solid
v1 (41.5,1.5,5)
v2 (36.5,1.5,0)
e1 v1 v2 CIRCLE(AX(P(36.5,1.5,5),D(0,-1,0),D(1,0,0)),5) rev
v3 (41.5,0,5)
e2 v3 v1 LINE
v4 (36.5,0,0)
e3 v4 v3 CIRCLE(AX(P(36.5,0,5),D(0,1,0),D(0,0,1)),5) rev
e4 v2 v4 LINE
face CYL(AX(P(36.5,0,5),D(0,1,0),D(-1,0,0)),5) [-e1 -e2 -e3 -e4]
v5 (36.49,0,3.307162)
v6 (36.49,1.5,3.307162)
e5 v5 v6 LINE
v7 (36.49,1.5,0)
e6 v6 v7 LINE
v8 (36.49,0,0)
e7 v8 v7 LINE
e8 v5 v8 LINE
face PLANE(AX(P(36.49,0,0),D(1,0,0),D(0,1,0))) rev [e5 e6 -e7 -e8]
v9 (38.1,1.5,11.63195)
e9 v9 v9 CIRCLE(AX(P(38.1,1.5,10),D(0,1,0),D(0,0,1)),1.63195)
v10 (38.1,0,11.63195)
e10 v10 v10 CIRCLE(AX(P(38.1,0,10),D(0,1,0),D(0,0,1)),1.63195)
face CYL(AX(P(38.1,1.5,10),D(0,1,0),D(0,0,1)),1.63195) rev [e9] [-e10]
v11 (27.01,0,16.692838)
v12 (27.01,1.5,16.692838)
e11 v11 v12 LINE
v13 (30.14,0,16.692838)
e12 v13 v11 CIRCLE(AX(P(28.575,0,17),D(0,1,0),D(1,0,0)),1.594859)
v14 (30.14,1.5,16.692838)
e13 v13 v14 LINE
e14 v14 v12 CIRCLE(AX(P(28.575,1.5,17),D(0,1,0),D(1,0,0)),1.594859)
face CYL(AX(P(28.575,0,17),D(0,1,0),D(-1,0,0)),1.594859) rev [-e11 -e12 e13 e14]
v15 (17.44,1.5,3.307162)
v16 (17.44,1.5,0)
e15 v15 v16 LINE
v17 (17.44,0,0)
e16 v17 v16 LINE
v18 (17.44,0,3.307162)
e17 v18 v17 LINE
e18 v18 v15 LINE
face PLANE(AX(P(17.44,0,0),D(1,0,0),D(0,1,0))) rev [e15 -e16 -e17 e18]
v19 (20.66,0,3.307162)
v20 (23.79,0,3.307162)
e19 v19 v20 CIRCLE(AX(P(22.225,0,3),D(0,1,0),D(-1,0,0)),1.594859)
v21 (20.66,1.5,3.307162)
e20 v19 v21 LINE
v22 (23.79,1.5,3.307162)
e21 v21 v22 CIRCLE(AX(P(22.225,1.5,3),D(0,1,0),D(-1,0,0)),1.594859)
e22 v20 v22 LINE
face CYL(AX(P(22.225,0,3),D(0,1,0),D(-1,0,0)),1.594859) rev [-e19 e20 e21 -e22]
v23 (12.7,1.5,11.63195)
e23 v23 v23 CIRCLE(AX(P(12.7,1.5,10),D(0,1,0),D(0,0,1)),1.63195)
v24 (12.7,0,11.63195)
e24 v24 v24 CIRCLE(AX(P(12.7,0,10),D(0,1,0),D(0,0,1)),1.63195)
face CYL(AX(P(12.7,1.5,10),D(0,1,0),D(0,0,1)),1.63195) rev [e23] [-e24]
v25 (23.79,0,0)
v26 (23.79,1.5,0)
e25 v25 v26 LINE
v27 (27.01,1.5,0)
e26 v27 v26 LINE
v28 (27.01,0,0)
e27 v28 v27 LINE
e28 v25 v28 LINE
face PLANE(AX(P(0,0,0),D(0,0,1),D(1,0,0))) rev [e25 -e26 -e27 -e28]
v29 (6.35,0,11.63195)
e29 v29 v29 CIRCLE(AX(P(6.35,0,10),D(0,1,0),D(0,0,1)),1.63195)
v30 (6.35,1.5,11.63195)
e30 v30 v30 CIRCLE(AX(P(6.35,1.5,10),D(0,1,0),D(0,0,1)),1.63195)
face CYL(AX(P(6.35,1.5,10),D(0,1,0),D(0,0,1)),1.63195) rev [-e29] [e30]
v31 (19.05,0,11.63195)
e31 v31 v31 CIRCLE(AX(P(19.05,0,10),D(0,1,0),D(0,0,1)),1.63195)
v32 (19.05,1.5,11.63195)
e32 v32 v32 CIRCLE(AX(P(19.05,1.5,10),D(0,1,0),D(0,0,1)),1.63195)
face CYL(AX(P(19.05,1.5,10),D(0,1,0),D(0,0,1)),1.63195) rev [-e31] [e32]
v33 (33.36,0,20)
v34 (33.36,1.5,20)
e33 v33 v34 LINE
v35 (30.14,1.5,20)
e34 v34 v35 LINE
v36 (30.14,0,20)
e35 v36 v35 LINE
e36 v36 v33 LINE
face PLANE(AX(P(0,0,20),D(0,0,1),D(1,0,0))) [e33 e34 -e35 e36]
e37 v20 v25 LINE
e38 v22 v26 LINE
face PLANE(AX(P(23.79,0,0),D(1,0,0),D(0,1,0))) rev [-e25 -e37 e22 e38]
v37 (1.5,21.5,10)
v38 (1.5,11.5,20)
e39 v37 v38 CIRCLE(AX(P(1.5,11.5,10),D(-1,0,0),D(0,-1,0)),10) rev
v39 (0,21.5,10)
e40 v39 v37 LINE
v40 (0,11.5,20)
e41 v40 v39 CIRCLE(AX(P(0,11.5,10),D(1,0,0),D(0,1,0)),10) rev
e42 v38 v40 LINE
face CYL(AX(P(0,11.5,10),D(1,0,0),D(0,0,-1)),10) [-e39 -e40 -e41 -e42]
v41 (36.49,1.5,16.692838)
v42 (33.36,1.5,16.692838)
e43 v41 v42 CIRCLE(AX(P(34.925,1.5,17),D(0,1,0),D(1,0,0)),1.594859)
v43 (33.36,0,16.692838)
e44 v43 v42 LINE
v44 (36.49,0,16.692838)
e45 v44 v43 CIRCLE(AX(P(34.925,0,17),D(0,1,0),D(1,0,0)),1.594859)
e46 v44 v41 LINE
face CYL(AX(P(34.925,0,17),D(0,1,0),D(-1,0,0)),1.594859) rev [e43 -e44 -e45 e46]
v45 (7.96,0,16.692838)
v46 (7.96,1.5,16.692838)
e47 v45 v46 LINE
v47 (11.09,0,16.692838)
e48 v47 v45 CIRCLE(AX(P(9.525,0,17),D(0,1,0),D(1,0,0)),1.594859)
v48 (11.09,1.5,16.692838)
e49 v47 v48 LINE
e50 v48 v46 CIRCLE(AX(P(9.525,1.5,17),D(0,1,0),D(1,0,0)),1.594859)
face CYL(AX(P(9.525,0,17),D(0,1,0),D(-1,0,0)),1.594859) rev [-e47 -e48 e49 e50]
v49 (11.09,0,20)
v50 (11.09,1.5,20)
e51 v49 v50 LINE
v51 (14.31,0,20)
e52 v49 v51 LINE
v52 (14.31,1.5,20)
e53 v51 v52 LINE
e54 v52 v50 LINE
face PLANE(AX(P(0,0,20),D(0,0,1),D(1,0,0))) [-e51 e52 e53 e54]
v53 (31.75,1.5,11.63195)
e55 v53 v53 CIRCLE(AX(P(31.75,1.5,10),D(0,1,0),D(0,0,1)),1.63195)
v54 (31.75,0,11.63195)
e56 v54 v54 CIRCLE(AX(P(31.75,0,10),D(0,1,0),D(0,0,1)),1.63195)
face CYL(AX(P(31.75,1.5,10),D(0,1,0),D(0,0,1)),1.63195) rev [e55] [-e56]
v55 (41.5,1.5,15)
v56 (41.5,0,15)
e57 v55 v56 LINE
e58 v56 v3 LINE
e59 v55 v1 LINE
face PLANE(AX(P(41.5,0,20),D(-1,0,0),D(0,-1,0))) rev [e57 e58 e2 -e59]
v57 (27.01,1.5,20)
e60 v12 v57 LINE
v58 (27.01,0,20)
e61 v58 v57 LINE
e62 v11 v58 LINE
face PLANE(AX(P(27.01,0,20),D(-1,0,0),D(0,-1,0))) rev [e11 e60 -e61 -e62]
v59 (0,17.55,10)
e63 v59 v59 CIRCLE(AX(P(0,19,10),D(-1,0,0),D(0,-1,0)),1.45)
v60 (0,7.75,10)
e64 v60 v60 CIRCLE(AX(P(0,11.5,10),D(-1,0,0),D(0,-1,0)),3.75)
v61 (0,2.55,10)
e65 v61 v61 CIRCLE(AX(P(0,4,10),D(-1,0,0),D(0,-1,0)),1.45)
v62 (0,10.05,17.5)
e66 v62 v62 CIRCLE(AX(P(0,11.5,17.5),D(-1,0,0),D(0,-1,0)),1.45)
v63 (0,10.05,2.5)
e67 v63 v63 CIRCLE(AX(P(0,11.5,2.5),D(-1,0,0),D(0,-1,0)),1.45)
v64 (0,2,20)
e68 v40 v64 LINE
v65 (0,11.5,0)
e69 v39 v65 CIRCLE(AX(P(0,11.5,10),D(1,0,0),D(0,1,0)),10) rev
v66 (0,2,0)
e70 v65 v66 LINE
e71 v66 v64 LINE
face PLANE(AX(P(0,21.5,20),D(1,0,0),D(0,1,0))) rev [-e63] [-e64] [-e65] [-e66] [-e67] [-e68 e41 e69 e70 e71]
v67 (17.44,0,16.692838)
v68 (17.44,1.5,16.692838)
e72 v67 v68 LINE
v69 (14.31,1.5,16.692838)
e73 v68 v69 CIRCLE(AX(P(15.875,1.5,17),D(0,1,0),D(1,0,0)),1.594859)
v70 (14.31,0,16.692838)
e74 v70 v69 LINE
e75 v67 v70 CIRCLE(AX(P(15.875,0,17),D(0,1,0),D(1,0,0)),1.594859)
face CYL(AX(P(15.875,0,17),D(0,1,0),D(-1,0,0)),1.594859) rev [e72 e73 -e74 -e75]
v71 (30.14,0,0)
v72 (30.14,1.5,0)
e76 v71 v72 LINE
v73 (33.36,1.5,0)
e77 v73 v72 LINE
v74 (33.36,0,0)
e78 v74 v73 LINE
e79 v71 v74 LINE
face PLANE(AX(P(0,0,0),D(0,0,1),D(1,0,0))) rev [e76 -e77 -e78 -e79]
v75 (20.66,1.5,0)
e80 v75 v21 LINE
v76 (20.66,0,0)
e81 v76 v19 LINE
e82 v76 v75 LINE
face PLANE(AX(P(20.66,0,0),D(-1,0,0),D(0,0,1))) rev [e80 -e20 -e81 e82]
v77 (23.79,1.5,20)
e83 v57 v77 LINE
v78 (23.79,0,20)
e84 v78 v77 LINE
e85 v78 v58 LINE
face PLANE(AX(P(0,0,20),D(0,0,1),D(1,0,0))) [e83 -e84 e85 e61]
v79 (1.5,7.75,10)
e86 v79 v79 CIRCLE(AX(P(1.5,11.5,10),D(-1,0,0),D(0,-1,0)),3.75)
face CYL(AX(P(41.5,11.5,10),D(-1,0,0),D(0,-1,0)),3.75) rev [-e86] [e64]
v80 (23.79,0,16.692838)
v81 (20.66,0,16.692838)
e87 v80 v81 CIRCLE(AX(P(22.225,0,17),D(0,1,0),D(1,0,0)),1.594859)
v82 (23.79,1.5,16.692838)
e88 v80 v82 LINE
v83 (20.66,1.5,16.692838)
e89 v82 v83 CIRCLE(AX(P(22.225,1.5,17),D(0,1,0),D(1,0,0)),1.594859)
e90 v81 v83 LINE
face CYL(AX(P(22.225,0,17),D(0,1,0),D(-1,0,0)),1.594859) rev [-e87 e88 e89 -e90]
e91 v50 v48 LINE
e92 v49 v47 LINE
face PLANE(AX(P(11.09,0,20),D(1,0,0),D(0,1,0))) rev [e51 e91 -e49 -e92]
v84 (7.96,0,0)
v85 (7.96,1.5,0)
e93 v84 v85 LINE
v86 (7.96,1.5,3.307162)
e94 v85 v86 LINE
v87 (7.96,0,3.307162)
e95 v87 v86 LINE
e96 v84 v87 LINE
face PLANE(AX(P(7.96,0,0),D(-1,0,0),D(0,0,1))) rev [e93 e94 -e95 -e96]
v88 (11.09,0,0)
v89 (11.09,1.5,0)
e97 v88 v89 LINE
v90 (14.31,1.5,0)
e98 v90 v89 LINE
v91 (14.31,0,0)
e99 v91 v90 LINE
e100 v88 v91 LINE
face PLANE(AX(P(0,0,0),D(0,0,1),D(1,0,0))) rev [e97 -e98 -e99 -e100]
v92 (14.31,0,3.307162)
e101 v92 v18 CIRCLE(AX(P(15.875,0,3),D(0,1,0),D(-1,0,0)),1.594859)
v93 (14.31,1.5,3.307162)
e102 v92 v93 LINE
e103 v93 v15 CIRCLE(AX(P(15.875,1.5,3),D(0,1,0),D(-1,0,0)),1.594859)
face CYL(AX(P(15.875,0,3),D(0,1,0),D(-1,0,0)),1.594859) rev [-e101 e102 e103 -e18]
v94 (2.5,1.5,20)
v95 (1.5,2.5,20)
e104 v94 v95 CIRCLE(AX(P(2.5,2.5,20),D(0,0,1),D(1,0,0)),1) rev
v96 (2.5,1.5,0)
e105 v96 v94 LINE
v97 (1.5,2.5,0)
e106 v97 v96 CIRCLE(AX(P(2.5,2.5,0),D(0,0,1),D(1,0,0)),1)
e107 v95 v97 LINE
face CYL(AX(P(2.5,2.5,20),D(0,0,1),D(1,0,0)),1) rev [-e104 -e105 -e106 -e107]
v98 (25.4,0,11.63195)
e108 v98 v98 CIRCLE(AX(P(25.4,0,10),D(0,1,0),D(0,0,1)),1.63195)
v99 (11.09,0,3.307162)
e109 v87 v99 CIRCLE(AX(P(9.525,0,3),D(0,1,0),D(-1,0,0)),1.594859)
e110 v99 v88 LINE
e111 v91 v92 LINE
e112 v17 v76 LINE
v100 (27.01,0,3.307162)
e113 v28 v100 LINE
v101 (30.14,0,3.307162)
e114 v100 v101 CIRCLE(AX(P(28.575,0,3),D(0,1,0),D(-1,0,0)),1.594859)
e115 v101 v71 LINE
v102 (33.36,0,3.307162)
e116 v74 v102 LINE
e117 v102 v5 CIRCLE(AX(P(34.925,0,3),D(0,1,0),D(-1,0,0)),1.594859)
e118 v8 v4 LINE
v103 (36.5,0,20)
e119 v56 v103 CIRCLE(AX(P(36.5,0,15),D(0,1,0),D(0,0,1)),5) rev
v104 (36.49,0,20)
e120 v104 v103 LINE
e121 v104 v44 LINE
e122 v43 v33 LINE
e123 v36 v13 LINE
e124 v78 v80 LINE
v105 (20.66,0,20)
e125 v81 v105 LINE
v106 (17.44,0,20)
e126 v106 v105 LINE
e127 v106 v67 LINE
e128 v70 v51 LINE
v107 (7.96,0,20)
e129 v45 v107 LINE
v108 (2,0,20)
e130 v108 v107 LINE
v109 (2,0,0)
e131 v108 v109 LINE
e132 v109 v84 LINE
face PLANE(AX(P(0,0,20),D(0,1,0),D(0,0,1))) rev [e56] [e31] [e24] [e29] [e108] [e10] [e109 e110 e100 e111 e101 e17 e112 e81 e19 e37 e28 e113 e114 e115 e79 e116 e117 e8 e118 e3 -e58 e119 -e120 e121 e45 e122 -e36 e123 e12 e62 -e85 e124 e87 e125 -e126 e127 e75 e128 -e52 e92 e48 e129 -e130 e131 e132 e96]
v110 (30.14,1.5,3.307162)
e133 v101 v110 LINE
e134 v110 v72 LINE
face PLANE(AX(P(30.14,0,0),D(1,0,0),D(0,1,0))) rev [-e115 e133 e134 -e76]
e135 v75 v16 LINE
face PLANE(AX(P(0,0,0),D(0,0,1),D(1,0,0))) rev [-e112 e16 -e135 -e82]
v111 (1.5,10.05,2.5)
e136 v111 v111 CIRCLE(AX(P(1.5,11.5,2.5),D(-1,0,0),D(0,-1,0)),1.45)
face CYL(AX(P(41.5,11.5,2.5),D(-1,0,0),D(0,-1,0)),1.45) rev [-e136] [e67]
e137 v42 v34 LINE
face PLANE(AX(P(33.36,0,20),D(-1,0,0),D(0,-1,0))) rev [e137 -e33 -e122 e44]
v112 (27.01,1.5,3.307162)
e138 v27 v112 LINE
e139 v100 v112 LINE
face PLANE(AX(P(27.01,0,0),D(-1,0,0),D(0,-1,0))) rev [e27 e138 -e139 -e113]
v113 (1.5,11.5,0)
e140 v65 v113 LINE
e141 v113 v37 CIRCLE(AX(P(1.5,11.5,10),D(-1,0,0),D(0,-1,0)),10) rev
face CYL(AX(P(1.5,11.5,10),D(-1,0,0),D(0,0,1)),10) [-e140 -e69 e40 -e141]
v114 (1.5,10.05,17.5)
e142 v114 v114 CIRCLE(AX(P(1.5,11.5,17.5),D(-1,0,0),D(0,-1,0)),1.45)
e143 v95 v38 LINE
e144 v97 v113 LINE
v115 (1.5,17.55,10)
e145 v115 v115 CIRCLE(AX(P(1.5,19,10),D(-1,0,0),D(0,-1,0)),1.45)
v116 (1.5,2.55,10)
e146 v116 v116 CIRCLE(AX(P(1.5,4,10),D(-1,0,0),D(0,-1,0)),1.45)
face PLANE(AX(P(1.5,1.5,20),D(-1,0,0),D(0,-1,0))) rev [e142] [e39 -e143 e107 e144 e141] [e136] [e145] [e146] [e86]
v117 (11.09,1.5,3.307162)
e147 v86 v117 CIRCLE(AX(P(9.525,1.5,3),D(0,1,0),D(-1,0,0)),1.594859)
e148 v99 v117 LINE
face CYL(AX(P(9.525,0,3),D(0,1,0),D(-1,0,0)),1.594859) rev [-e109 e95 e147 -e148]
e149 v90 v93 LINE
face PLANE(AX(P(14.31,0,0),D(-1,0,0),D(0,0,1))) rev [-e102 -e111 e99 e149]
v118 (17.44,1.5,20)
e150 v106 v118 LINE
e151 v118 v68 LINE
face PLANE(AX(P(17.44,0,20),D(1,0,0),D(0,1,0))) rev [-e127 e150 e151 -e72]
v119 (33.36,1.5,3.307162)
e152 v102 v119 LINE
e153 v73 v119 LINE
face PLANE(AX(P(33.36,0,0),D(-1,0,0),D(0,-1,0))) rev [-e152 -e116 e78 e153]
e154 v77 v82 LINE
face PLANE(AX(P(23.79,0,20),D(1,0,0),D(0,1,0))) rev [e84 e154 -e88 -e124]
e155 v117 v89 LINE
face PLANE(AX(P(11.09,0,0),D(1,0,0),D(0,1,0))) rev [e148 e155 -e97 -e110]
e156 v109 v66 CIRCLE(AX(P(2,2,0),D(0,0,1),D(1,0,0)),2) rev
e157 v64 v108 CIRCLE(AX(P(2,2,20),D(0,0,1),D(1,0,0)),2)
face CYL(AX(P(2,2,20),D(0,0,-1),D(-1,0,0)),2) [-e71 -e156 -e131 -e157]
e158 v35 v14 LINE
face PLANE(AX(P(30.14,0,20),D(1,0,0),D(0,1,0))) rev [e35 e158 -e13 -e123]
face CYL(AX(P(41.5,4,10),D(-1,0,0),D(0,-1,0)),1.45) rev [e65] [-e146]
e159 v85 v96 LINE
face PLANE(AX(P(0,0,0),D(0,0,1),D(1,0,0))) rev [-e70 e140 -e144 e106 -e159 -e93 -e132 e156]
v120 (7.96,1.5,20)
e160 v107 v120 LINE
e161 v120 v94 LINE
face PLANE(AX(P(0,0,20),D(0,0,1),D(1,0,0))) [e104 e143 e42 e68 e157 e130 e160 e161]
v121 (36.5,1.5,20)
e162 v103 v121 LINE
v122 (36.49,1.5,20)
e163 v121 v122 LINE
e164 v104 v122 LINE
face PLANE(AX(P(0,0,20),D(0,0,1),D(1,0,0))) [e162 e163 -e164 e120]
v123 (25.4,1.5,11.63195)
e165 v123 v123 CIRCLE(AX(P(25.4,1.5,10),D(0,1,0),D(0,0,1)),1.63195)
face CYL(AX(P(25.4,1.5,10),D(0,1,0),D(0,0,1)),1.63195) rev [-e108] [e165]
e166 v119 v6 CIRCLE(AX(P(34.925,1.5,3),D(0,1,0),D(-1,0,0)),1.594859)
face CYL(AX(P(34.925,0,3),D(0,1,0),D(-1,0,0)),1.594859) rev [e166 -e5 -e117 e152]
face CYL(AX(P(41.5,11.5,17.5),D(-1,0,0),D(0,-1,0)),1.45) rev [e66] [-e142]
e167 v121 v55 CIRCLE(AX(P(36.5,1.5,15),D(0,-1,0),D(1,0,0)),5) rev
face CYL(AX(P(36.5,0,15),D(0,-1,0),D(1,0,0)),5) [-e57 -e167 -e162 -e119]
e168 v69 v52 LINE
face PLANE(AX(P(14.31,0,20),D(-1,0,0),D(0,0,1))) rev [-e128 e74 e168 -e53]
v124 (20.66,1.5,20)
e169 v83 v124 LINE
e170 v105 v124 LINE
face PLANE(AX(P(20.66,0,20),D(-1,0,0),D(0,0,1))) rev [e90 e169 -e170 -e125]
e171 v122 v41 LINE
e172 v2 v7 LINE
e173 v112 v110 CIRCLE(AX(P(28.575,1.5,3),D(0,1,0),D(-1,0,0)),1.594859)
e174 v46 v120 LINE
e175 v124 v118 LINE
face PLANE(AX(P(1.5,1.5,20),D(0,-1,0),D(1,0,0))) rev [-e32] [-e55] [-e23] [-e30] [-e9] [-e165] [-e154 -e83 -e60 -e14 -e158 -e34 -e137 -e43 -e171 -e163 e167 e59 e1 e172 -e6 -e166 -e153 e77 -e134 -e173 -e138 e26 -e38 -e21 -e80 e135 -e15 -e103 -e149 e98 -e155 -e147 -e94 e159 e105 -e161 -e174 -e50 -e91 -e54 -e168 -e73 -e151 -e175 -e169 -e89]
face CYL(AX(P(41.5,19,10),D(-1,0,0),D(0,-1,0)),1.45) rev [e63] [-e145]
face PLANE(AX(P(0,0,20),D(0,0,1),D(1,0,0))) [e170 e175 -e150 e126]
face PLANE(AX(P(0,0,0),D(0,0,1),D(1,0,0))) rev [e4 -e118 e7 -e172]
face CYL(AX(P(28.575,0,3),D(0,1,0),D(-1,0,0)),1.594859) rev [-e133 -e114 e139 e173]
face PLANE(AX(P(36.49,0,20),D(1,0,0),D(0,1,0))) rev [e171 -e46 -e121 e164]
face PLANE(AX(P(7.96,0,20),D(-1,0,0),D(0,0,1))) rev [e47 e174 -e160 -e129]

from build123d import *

# Parameters (mm, degrees)
BOSS_EXTRUDE1_DEPTH   = 20
FILLET1_R             = 2
FILLET2_R             = 1
CUT_EXTRUDE1_DEPTH    = 51.222007128
F_4_CLEARANCE_HOLE1_D = 3.2639
FILLET3_R             = 5
FILLET4_R             = 10
SKETCH7_R             = 3.75
SKETCH7_R_2           = 1.45
CUT_EXTRUDE2_DEPTH    = 51.83797793


with BuildPart() as part:
    # Sketch1 → Boss-Extrude1 (new body)
    with BuildSketch(Plane.XY):
        Polygon((0, 0), (41.5, 0), (41.5, 1.5), (1.5, 1.5), (1.5, 21.5), (0, 21.5), align=None)
    extrude(amount=BOSS_EXTRUDE1_DEPTH)

    # Fillet1
    fillet1_edges = [part.edges().sort_by_distance(p)[0] for p in [
        (0, 0, 10),
    ]]
    fillet(fillet1_edges, radius=FILLET1_R)

    # Fillet2
    fillet2_edges = [part.edges().sort_by_distance(p)[0] for p in [
        (1.5, 1.5, 10),
    ]]
    fillet(fillet2_edges, radius=FILLET2_R)

    # Sketch3 → Cut-Extrude1 (cut, through all)
    with BuildSketch(Plane(origin=(0, 1.5, 0), x_dir=(1, 0, 0), z_dir=(0, 1, 0))):
        with BuildLine():
            Line((7.96, 0), (11.09, 0))
            Line((11.09, 0), (11.09, -3.307162367))
            ThreePointArc((11.09, -3.307162367), (9.525, -4.594858526), (7.96, -3.307162367))
            Line((7.96, -3.307162367), (7.96, 0))
        make_face()
        with BuildLine():
            Line((14.31, 0), (17.44, 0))
            Line((17.44, 0), (17.44, -3.307162367))
            ThreePointArc((17.44, -3.307162367), (15.875, -4.594858526), (14.31, -3.307162367))
            Line((14.31, -3.307162367), (14.31, 0))
        make_face()
        with BuildLine():
            Line((20.66, 0), (23.79, 0))
            Line((23.79, 0), (23.79, -3.307162367))
            ThreePointArc((23.79, -3.307162367), (22.225, -4.594858526), (20.66, -3.307162367))
            Line((20.66, -3.307162367), (20.66, 0))
        make_face()
        with BuildLine():
            Line((27.01, 0), (30.14, 0))
            Line((30.14, 0), (30.14, -3.307162367))
            ThreePointArc((30.14, -3.307162367), (28.575, -4.594858526), (27.01, -3.307162367))
            Line((27.01, -3.307162367), (27.01, 0))
        make_face()
        with BuildLine():
            Line((33.36, 0), (36.49, 0))
            Line((36.49, 0), (36.49, -3.307162367))
            ThreePointArc((36.49, -3.307162367), (34.925, -4.594858526), (33.36, -3.307162367))
            Line((33.36, -3.307162367), (33.36, 0))
        make_face()
        with BuildLine():
            Line((36.49, -20), (36.49, -16.692837633))
            ThreePointArc((36.49, -16.692837633), (34.925, -15.405141474), (33.36, -16.692837633))
            Line((33.36, -16.692837633), (33.36, -20))
            Line((33.36, -20), (36.49, -20))
        make_face()
        with BuildLine():
            Line((30.14, -20), (30.14, -16.692837633))
            ThreePointArc((30.14, -16.692837633), (28.575, -15.405141474), (27.01, -16.692837633))
            Line((27.01, -16.692837633), (27.01, -20))
            Line((27.01, -20), (30.14, -20))
        make_face()
        with BuildLine():
            Line((23.79, -20), (23.79, -16.692837633))
            ThreePointArc((23.79, -16.692837633), (22.225, -15.405141474), (20.66, -16.692837633))
            Line((20.66, -16.692837633), (20.66, -20))
            Line((20.66, -20), (23.79, -20))
        make_face()
        with BuildLine():
            Line((17.44, -20), (17.44, -16.692837633))
            ThreePointArc((17.44, -16.692837633), (15.875, -15.405141474), (14.31, -16.692837633))
            Line((14.31, -16.692837633), (14.31, -20))
            Line((14.31, -20), (17.44, -20))
        make_face()
        with BuildLine():
            Line((11.09, -20), (11.09, -16.692837633))
            ThreePointArc((11.09, -16.692837633), (9.525, -15.405141474), (7.96, -16.692837633))
            Line((7.96, -16.692837633), (7.96, -20))
            Line((7.96, -20), (11.09, -20))
        make_face()
    extrude(amount=-CUT_EXTRUDE1_DEPTH, mode=Mode.SUBTRACT)

    # #4 Clearance Hole1 (through all)
    with Locations(Plane(origin=(0, 1.5, 0), x_dir=(1, 0, 0), z_dir=(0, 1, 0))):
        with Locations((6.35, -10), (12.7, -10), (25.4, -10), (31.75, -10), (38.1, -10), (19.05, -10)):
            Hole(F_4_CLEARANCE_HOLE1_D / 2)

    # Fillet3
    fillet3_edges = [part.edges().sort_by_distance(p)[0] for p in [
        (41.5, 0.75, 20),
        (41.5, 0.75, 0),
    ]]
    fillet(fillet3_edges, radius=FILLET3_R)

    # Fillet4
    fillet4_edges = [part.edges().sort_by_distance(p)[0] for p in [
        (0.75, 21.5, 0),
        (0.75, 21.5, 20),
    ]]
    fillet(fillet4_edges, radius=FILLET4_R - 0.0001)  # a hair under: the kernel refuses the full size

    # Sketch7 → Cut-Extrude2 (cut, through all)
    with BuildSketch(Plane.ZY):
        with Locations(Location((10, 11.5, 0), (0, 0, 270))):
            Circle(SKETCH7_R)
        with Locations(Location((10, 19, 0), (0, 0, 270))):
            Circle(SKETCH7_R_2)
        with Locations(Location((17.5, 11.5, 0), (0, 0, 270))):
            Circle(SKETCH7_R_2)
        with Locations(Location((10, 4, 0), (0, 0, 270))):
            Circle(SKETCH7_R_2)
        with Locations(Location((2.5, 11.5, 0), (0, 0, 270))):
            Circle(SKETCH7_R_2)
    extrude(amount=-CUT_EXTRUDE2_DEPTH, mode=Mode.SUBTRACT)


solid = part.part
